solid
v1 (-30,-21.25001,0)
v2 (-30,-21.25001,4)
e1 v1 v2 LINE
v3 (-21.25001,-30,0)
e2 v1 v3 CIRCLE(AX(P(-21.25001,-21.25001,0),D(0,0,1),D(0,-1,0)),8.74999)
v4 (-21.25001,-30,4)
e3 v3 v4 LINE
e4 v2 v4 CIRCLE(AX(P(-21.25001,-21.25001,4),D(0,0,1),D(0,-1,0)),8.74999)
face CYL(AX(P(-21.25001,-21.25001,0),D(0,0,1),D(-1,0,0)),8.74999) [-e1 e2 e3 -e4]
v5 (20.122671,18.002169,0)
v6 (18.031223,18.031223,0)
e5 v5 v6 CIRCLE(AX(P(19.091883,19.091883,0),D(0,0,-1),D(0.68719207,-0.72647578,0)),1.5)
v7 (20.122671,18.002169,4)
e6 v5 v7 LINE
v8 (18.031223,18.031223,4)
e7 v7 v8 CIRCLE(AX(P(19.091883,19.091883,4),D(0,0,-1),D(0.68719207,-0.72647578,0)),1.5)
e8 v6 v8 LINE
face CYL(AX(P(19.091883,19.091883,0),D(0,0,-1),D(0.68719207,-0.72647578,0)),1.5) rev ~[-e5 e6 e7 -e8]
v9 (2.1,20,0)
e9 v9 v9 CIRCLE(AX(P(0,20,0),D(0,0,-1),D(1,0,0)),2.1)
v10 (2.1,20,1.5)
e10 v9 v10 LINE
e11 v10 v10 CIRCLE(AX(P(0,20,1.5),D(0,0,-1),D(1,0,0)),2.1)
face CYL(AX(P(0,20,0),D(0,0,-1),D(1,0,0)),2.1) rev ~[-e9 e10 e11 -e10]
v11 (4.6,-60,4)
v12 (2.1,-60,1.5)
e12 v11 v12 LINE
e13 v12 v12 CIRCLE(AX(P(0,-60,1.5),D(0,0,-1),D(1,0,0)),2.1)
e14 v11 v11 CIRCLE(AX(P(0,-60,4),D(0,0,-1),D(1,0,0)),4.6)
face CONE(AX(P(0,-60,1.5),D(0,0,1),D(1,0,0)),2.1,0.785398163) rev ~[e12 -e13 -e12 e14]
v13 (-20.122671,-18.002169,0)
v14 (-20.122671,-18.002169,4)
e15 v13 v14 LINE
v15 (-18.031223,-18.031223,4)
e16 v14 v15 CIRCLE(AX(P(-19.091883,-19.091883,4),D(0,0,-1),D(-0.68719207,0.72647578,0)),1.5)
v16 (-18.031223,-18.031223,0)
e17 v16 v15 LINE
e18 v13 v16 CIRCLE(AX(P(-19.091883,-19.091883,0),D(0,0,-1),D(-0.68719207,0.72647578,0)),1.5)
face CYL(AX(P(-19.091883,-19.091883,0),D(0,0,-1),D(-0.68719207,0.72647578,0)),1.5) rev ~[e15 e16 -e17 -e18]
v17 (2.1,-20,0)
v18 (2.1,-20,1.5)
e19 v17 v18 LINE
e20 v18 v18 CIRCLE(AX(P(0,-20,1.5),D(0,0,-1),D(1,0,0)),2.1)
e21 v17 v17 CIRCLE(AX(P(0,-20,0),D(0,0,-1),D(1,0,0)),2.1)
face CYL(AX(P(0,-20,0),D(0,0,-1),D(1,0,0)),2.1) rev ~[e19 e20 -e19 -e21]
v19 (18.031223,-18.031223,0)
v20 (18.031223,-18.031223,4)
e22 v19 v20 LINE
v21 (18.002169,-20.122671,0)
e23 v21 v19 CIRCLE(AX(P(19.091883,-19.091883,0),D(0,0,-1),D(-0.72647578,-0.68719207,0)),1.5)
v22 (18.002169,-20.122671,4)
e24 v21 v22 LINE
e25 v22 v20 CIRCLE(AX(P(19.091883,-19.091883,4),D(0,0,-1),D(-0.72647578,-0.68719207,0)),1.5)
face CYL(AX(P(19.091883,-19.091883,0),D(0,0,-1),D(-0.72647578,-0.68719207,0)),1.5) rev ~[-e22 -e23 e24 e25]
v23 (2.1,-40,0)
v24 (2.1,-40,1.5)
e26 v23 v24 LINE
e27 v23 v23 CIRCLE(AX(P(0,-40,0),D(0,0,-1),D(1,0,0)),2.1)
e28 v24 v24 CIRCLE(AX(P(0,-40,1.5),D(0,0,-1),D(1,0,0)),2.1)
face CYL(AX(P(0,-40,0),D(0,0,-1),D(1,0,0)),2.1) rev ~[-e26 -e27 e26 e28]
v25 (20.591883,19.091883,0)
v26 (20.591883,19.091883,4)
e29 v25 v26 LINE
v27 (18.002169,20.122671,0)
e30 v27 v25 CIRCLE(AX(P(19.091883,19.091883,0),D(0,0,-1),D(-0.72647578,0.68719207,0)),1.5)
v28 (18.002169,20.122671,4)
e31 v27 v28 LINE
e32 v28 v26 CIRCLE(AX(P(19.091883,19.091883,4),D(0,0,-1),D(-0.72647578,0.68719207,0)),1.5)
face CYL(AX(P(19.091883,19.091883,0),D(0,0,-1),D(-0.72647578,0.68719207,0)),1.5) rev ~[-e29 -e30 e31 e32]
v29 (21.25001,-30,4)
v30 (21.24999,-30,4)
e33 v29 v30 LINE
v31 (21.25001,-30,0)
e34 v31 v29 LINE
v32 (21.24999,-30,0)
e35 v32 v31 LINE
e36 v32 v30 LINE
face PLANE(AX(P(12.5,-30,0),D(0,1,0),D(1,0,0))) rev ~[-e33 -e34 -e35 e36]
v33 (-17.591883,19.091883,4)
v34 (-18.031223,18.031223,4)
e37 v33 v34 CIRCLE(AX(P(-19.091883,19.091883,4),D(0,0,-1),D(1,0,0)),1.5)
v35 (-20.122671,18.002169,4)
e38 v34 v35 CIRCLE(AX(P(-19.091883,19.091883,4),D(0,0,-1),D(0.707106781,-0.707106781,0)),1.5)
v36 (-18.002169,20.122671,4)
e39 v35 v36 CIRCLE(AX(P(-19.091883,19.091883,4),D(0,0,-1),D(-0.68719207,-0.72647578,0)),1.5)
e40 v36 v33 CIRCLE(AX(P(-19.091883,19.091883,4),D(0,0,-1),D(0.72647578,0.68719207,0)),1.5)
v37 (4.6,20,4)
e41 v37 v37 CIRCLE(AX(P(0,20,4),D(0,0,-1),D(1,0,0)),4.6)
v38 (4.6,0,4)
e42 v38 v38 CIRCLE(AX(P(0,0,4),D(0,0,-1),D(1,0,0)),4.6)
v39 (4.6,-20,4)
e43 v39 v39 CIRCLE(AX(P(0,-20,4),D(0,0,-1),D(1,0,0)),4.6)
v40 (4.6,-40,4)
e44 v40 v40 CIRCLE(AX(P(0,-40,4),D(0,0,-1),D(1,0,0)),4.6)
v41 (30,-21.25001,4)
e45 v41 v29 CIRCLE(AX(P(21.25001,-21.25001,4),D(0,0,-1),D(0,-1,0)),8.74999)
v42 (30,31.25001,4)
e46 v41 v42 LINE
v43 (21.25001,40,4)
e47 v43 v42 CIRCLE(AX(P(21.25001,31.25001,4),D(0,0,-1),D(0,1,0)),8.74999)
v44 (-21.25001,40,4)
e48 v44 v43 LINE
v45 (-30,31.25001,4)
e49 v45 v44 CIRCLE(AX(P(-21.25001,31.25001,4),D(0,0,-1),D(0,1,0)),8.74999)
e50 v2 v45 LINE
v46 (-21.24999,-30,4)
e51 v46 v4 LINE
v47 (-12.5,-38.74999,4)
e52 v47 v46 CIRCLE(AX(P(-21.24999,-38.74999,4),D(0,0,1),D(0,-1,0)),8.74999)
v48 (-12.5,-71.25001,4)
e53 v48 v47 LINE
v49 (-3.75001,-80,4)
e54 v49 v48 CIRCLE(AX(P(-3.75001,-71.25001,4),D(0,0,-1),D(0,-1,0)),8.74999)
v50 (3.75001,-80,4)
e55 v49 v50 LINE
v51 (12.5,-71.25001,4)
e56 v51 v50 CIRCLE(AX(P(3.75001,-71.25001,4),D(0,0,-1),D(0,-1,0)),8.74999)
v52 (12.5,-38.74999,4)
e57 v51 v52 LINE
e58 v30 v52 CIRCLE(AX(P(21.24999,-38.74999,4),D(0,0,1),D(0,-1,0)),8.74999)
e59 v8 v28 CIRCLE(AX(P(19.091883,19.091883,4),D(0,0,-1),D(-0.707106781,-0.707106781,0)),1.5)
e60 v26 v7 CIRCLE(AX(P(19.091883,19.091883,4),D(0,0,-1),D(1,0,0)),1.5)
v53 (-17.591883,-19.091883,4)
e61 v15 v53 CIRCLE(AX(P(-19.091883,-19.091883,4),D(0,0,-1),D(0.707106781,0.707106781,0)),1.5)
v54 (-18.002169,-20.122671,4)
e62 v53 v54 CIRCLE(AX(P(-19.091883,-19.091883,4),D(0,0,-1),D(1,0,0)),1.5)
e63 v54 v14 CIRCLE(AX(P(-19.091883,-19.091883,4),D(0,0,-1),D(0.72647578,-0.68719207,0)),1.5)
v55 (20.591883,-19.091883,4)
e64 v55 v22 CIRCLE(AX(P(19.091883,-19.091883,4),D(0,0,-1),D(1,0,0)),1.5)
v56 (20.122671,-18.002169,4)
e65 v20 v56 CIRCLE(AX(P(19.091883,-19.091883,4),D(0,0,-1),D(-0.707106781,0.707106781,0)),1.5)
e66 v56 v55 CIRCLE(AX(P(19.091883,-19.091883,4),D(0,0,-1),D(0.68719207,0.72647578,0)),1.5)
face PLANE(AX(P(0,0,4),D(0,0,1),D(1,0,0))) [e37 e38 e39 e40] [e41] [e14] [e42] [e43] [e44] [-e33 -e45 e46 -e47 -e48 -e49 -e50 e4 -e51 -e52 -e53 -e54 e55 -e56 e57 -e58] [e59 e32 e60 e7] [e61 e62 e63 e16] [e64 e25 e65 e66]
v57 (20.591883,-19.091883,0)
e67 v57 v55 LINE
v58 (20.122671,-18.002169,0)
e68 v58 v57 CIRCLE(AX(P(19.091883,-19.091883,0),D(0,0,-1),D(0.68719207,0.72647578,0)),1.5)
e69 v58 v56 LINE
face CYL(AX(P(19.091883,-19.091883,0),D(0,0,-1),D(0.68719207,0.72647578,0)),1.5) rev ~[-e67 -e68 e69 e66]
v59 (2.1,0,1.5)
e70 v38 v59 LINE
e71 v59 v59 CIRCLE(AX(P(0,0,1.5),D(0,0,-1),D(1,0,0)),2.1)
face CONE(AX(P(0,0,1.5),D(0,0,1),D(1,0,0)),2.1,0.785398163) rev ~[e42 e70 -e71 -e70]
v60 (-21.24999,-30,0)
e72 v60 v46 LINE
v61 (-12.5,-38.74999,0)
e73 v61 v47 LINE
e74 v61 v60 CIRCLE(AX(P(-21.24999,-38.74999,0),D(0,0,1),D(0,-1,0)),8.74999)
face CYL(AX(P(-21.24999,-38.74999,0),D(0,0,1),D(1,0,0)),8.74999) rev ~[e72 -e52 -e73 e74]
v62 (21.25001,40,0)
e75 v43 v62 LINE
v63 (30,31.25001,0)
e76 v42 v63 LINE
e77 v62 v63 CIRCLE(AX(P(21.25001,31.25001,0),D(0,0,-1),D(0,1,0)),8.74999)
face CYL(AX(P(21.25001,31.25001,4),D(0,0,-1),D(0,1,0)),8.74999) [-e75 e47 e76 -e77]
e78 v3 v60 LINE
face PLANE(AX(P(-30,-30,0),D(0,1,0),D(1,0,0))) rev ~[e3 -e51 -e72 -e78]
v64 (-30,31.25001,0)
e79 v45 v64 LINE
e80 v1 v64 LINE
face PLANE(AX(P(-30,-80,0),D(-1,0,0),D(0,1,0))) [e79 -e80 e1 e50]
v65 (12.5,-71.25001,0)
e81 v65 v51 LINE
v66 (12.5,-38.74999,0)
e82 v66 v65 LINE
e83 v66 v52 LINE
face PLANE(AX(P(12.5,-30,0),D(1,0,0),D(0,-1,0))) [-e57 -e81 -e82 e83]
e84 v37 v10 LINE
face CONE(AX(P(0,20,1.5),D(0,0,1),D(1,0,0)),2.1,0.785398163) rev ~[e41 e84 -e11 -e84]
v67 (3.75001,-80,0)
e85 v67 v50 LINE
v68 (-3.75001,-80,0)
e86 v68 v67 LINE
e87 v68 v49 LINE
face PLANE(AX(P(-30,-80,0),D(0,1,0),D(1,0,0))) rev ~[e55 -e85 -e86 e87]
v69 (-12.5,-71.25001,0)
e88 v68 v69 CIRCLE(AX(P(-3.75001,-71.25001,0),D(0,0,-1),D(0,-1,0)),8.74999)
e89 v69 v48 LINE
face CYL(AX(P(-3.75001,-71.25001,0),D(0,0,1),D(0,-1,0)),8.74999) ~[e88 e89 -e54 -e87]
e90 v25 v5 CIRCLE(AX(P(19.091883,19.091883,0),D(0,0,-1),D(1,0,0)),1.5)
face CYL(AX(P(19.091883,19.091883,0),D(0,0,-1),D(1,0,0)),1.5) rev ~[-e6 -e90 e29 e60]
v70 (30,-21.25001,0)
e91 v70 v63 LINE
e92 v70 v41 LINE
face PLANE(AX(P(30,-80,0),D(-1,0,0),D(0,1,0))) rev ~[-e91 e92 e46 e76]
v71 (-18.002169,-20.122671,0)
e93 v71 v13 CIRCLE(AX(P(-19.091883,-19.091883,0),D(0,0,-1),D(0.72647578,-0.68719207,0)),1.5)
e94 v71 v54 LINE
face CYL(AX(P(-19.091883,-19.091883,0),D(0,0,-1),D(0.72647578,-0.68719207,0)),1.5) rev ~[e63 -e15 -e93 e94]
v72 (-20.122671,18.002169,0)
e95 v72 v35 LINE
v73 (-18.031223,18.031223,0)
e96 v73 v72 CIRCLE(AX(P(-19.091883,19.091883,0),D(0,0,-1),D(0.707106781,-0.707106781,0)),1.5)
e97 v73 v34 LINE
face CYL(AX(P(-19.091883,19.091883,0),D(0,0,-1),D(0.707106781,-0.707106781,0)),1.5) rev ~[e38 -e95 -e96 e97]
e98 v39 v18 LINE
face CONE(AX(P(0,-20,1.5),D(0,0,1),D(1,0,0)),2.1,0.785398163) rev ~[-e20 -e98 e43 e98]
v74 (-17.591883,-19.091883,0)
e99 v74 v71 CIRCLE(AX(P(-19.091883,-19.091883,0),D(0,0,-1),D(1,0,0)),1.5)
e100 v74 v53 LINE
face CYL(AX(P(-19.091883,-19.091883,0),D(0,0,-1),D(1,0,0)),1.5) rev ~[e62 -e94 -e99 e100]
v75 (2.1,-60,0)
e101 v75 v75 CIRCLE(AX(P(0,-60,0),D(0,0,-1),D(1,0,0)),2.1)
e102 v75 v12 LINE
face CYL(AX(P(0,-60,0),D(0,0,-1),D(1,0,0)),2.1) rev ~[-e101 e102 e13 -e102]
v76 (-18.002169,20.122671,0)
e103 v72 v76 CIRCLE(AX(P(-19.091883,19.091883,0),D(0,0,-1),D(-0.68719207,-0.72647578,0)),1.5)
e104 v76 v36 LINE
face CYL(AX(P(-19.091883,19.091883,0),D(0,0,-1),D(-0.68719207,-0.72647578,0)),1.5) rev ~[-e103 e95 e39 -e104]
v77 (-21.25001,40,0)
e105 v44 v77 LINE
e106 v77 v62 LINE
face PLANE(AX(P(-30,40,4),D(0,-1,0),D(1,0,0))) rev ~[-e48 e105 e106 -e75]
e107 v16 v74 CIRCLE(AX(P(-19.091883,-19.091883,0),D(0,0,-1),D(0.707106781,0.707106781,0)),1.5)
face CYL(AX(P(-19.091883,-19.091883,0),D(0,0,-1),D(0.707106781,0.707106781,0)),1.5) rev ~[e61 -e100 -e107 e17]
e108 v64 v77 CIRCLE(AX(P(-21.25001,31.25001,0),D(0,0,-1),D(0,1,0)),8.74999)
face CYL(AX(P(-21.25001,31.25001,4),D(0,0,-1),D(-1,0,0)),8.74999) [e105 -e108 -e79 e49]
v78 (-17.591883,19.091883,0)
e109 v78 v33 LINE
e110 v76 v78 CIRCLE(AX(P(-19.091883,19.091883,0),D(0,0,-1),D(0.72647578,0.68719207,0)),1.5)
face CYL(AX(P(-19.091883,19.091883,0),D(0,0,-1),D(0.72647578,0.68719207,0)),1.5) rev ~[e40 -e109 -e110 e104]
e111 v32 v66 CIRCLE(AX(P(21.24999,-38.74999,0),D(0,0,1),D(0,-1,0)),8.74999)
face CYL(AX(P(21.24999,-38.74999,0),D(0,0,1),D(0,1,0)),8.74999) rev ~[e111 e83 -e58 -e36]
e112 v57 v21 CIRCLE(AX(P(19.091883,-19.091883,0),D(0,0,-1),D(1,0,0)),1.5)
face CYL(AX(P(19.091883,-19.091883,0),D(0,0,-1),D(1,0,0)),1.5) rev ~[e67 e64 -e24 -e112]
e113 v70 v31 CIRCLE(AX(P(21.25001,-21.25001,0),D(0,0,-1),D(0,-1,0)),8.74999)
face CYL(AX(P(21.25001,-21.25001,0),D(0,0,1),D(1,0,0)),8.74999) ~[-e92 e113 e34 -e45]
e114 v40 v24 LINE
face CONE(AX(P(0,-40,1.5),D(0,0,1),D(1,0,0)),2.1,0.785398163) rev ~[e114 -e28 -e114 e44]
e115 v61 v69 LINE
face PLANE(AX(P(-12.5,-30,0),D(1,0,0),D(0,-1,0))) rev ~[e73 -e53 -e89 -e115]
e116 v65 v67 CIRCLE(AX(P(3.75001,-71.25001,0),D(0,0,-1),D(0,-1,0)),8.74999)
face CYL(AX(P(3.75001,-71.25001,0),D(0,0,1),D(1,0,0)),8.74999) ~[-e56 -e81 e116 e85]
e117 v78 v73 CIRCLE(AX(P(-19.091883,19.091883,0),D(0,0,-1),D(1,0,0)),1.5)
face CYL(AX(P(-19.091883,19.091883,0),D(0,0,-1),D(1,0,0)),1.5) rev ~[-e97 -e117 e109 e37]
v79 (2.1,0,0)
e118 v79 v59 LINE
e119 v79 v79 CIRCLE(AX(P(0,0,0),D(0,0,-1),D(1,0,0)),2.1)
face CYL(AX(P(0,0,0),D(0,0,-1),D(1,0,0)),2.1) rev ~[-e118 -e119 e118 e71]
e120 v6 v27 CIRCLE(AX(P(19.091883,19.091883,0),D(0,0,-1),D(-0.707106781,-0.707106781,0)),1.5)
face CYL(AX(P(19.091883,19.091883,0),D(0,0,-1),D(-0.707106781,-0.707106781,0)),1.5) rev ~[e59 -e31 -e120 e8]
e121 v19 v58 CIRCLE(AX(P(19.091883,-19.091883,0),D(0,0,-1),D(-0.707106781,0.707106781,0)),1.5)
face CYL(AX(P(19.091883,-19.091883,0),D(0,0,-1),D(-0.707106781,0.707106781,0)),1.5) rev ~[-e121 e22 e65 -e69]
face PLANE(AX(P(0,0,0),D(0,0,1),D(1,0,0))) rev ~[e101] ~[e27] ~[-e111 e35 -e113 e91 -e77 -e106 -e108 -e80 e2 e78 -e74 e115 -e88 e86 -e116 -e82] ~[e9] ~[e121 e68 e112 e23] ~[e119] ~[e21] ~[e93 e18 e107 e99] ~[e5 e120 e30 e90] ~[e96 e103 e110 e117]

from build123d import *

# Parameters (mm, degrees)
F0_W     = 60
F0_H     = 160
F1_DEPTH = 4
F2_W     = 60
F2_H     = 40
F3_DEPTH = 4.001
F4_R     = 2.1
F5_DEPTH = 4.001
F6_SIZE  = 2.5
F7_W     = 17.5
F7_H     = 50
F8_DEPTH = 4.001
F9_R     = 8.74999


# Not quite as in the source:
# - a fillet or chamfer is up to 0.001 mm smaller than in the source, because OpenCascade refuses the exact size


with BuildPart() as f1:
    # F0 (on Top) → F1 (new body)
    with BuildSketch(Plane.XY):
        Rectangle(F0_W, F0_H)
        with BuildLine():
            ThreePointArc((20.122671197, 18.002169422), (25.2221343498, 9.6355559695), (27, 0))
            ThreePointArc((27, 0), (25.2221343498, -9.6355559695), (20.122671197, -18.002169422))
            ThreePointArc((20.122671197, -18.002169422), (20.4695953547, -18.4986639746), (20.591883092, -19.091883092))
            ThreePointArc((20.591883092, -19.091883092), (19.6466035148, -20.4855420362), (18.002169422, -20.122671197))
            ThreePointArc((18.002169422, -20.122671197), (0, -27), (-18.002169422, -20.122671197))
            ThreePointArc((-18.002169422, -20.122671197), (-20.1525432638, -20.1525432638), (-20.122671197, -18.002169422))
            ThreePointArc((-20.122671197, -18.002169422), (-27, 0), (-20.122671197, 18.002169422))
            ThreePointArc((-20.122671197, 18.002169422), (-20.1525432638, 20.1525432638), (-18.002169422, 20.122671197))
            ThreePointArc((-18.002169422, 20.122671197), (0, 27), (18.002169422, 20.122671197))
            ThreePointArc((18.002169422, 20.122671197), (19.6466035148, 20.4855420362), (20.591883092, 19.091883092))
            ThreePointArc((20.591883092, 19.091883092), (20.4695953547, 18.4986639746), (20.122671197, 18.002169422))
        make_face(mode=Mode.SUBTRACT)
        with BuildLine():
            Line((-18.0312229203, -18.0312229203), (0, 0))
            Line((0, 0), (-18.0312229203, 18.0312229203))
            ThreePointArc((-18.0312229203, 18.0312229203), (-19.0710477486, 17.5920278029), (-20.122671197, 18.002169422))
            ThreePointArc((-20.122671197, 18.002169422), (-27, 0), (-20.122671197, -18.002169422))
            ThreePointArc((-20.122671197, -18.002169422), (-19.0710477486, -17.5920278029), (-18.0312229203, -18.0312229203))
        make_face()
        with BuildLine():
            Line((0, 0), (18.0312229203, 18.0312229203))
            ThreePointArc((18.0312229203, 18.0312229203), (17.5920278029, 19.0710477486), (18.002169422, 20.122671197))
            ThreePointArc((18.002169422, 20.122671197), (0, 27), (-18.002169422, 20.122671197))
            ThreePointArc((-18.002169422, 20.122671197), (-17.6982241479, 19.6466035148), (-17.591883092, 19.091883092))
            ThreePointArc((-17.591883092, 19.091883092), (-17.7060637933, 18.5178579435), (-18.0312229203, 18.0312229203))
            Line((-18.0312229203, 18.0312229203), (0, 0))
        make_face()
        with BuildLine():
            ThreePointArc((20.122671197, -18.002169422), (25.2221343498, -9.6355559695), (27, 0))
            ThreePointArc((27, 0), (25.2221343498, 9.6355559695), (20.122671197, 18.002169422))
            ThreePointArc((20.122671197, 18.002169422), (19.0710477486, 17.5920278029), (18.0312229203, 18.0312229203))
            Line((18.0312229203, 18.0312229203), (0, 0))
            Line((0, 0), (18.0312229203, -18.0312229203))
            ThreePointArc((18.0312229203, -18.0312229203), (19.0710477486, -17.5920278029), (20.122671197, -18.002169422))
        make_face()
        with BuildLine():
            ThreePointArc((18.002169422, -20.122671197), (17.5920278029, -19.0710477486), (18.0312229203, -18.0312229203))
            Line((18.0312229203, -18.0312229203), (0, 0))
            Line((0, 0), (-18.0312229203, -18.0312229203))
            ThreePointArc((-18.0312229203, -18.0312229203), (-17.7060637933, -18.5178579435), (-17.591883092, -19.091883092))
            ThreePointArc((-17.591883092, -19.091883092), (-17.6982241479, -19.6466035148), (-18.002169422, -20.122671197))
            ThreePointArc((-18.002169422, -20.122671197), (0, -27), (18.002169422, -20.122671197))
        make_face()
    extrude(amount=F1_DEPTH)

    # F2 (on face) → F3 (cut, through all)
    with BuildSketch(Plane.XY.offset(4)):
        with Locations((0, 60)):
            Rectangle(F2_W, F2_H)
    extrude(amount=-F3_DEPTH, mode=Mode.SUBTRACT)

    # F4 (on face) → F5 (cut, through all)
    with BuildSketch(Plane(origin=(0, 0, 0), x_dir=(1, 0, 0), z_dir=(0, 0, -1))):
        with Locations((0, 40)):
            Circle(F4_R)
        Circle(F4_R)
        with Locations((0, 20)):
            Circle(F4_R)
        with Locations((0, -20)):
            Circle(F4_R)
        with Locations((0, 60)):
            Circle(F4_R)
    extrude(amount=-F5_DEPTH, mode=Mode.SUBTRACT)

    # F6
    f6_edges = [f1.edges().sort_by_distance(p)[0] for p in [
        (-2.1, -60, 4),
        (-2.1, -40, 4),
        (-2.1, -20, 4),
        (-2.1, 0, 4),
        (-2.1, 20, 4),
    ]]
    chamfer(f6_edges, length=F6_SIZE)

    # F7 (on face) → F8 (cut, through all)
    with BuildSketch(Plane(origin=(0, 0, 0), x_dir=(1, 0, 0), z_dir=(0, 0, -1))):
        with Locations((-21.25, 55)):
            Rectangle(F7_W, F7_H)
        with Locations((21.25, 55)):
            Rectangle(F7_W, F7_H)
    extrude(amount=-F8_DEPTH, mode=Mode.SUBTRACT)

    # F9 (radius 8.75 in the source; OpenCascade refuses exactly that, so slightly less here)
    f9_edges = [f1.edges().sort_by_distance(p)[0] for p in [
        (-12.5, -30, 2),
        (-30, -30, 2),
        (12.5, -30, 2),
        (30, -30, 2),
        (-30, 40, 2),
        (30, 40, 2),
        (-12.5, -80, 2),
        (12.5, -80, 2),
    ]]
    fillet(f9_edges, radius=F9_R)


solid = f1.part
